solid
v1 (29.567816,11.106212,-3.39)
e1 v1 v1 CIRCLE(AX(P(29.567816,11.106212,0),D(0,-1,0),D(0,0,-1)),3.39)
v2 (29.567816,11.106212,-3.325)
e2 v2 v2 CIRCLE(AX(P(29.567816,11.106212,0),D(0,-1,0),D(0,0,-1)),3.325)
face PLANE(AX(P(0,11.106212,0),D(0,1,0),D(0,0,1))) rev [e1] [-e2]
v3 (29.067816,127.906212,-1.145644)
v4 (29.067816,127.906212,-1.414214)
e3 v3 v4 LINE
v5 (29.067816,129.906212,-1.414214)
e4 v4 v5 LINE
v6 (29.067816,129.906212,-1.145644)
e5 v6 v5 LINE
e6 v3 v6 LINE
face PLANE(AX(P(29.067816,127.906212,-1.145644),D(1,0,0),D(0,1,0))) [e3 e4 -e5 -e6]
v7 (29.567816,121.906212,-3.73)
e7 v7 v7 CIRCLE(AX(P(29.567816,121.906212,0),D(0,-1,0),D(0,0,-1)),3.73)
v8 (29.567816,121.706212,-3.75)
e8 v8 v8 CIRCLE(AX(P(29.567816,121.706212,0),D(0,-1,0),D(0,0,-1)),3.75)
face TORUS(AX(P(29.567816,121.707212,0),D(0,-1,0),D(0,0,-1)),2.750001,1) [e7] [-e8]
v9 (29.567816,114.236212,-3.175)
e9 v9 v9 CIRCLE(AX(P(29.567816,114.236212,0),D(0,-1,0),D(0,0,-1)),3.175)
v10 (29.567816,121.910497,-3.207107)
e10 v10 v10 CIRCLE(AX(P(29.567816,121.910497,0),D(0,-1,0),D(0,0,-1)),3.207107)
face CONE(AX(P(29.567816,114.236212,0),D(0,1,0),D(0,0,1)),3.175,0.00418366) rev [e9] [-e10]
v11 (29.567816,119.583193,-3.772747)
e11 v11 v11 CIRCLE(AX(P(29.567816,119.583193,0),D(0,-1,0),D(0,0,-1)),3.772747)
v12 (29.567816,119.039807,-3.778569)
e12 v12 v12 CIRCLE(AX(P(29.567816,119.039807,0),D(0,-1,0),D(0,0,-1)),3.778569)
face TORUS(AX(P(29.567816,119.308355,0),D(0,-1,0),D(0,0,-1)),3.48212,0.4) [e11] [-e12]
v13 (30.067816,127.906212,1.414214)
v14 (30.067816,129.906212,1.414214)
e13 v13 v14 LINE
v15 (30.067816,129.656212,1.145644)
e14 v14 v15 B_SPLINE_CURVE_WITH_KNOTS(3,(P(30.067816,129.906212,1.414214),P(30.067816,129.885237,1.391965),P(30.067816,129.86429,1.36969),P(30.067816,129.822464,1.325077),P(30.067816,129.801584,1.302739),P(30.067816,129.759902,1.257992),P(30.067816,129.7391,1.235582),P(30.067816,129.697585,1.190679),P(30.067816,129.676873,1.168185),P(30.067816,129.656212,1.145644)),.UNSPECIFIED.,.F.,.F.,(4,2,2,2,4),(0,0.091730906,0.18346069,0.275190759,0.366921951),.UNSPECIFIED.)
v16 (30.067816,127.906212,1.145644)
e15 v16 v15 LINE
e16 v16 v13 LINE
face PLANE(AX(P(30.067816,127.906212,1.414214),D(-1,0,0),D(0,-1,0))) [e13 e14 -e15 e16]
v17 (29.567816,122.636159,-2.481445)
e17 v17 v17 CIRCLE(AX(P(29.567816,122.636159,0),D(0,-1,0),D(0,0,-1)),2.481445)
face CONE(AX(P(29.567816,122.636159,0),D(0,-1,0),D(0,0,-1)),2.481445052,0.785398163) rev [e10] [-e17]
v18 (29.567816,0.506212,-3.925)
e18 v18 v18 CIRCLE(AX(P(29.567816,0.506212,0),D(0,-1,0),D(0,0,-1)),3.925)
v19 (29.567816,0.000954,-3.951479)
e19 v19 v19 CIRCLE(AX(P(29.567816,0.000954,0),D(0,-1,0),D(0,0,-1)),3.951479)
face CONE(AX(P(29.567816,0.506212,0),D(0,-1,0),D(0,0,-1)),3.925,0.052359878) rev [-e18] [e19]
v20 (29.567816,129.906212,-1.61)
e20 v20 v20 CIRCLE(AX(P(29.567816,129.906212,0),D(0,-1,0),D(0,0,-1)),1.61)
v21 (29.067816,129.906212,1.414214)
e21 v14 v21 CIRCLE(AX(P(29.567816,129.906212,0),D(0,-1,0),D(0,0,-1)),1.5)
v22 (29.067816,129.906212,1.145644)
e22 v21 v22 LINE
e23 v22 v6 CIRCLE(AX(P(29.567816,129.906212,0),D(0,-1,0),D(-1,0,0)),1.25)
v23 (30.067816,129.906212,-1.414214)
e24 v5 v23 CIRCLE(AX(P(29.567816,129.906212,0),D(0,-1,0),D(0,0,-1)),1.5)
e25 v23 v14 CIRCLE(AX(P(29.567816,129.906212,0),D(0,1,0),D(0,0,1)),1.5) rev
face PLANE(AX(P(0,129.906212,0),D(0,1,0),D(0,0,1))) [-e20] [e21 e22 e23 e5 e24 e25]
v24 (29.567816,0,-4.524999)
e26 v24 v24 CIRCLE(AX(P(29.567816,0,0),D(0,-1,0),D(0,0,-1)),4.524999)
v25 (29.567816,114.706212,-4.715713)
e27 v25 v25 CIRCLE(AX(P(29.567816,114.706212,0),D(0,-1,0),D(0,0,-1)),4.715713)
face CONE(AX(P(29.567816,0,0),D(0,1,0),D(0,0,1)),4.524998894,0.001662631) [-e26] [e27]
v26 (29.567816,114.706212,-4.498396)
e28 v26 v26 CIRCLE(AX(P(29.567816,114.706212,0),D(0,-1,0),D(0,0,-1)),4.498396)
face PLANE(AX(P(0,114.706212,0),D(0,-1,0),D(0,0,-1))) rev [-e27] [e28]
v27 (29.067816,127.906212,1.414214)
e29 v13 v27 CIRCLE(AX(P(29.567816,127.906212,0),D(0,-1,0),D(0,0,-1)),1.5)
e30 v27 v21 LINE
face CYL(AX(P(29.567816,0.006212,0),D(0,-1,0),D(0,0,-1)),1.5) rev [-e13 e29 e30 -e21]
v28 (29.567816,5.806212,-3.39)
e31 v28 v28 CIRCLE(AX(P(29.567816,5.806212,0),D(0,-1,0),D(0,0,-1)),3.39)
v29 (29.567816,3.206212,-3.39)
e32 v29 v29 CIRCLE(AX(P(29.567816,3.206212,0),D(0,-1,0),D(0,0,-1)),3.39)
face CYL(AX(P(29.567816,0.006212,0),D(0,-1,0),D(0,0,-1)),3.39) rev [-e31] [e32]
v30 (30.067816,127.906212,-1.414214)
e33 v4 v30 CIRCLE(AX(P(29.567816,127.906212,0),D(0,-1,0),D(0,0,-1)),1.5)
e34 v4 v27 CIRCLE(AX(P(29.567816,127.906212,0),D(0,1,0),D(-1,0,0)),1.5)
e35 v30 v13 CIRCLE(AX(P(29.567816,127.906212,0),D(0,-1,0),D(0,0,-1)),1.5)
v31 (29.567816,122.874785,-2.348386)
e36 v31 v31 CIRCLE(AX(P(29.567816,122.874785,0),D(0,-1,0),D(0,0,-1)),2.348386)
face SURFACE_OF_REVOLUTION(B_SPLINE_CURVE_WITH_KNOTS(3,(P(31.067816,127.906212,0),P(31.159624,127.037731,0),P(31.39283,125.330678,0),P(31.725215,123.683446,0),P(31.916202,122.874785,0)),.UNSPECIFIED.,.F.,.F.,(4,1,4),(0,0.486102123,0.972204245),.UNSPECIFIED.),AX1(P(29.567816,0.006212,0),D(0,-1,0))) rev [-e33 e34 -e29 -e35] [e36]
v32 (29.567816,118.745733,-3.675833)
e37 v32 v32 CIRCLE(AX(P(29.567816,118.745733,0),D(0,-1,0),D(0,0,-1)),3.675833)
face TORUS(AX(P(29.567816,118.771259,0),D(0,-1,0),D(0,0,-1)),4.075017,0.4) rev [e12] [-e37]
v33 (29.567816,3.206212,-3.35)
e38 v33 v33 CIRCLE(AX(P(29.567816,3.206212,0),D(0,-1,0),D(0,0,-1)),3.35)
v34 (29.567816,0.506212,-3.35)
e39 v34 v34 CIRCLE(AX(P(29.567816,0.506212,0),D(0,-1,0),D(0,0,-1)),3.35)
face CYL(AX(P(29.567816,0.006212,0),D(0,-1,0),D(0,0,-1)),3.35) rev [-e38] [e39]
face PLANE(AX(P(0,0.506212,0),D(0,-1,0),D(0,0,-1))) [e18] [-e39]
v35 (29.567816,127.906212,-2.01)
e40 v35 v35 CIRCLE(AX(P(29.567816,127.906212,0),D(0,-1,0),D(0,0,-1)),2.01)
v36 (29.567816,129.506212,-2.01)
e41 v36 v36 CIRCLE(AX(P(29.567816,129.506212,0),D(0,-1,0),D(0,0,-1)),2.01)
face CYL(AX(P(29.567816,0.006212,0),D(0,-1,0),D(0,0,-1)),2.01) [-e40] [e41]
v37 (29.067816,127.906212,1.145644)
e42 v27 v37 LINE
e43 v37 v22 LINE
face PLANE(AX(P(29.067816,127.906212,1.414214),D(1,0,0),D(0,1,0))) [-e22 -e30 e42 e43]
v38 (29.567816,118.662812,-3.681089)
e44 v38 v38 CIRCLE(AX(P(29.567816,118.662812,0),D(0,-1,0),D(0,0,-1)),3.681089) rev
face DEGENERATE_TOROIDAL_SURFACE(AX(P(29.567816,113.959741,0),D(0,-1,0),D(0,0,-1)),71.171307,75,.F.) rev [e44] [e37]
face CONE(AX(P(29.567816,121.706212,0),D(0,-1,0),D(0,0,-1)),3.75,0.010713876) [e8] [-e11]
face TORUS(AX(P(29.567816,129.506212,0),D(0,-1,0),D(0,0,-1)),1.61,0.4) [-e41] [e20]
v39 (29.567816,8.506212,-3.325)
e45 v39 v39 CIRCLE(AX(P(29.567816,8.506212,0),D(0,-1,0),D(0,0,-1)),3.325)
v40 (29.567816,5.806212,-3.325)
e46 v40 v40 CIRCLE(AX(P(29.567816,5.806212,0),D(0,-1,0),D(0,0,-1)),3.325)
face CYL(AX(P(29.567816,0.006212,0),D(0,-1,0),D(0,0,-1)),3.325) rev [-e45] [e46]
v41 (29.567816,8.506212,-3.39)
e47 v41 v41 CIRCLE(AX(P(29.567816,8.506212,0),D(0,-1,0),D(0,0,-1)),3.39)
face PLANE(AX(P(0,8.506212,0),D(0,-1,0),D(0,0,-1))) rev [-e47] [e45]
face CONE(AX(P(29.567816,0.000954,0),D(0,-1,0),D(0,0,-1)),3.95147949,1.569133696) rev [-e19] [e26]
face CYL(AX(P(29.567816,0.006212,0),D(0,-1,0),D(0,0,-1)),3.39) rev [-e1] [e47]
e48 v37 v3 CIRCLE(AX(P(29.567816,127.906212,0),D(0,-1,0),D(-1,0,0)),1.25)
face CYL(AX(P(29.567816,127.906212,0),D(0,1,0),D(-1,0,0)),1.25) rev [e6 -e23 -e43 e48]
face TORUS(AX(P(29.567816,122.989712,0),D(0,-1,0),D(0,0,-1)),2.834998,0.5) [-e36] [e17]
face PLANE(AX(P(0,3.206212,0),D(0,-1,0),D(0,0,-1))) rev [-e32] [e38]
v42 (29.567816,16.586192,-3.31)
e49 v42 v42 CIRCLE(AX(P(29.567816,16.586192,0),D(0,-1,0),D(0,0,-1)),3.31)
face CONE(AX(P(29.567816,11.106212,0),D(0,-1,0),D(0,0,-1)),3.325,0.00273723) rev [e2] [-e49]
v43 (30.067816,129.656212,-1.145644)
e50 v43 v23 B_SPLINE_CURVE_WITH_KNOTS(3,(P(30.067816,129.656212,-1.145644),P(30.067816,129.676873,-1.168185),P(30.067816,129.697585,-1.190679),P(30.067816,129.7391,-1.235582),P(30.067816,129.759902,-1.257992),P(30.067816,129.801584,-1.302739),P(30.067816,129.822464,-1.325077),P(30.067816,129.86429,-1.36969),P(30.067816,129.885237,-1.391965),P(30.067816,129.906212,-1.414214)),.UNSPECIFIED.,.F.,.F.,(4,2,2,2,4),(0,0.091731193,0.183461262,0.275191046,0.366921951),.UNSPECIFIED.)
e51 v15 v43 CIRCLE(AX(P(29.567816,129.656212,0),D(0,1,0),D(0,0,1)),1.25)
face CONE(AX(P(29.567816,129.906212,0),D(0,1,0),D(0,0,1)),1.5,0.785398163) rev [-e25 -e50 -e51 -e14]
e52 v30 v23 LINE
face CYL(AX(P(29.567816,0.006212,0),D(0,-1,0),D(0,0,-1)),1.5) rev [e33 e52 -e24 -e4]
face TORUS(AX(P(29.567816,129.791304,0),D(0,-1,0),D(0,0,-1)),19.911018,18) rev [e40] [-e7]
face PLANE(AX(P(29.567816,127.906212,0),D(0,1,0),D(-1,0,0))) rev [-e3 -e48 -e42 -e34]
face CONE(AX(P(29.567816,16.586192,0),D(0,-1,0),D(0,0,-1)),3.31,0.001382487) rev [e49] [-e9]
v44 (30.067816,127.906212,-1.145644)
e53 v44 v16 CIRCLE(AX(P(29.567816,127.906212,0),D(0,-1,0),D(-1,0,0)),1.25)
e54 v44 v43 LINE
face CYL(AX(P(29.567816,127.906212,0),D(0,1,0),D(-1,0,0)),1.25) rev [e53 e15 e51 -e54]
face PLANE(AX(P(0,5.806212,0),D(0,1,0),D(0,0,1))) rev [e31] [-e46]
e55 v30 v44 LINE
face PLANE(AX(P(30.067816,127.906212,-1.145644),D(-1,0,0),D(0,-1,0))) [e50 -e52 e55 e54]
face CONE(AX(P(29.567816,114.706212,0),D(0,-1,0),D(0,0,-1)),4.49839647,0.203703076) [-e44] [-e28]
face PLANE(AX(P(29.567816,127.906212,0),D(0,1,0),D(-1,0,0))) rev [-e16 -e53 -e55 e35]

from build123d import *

# Parameters (mm, degrees)
RESSALTO_EXTRUS_O1_DEPTH = 2
CHANFRO1_SIZE            = 0.25


with BuildPart() as part:
    # Esboço1 → Revolução1 (revolve)
    with BuildSketch(Plane.XY, mode=Mode.PRIVATE) as revolu_o1_sk:
        with BuildLine():
            Line((33.39279432927903, 114.70621231461361), (34.28352921645039, 114.70621231461361))
            Line((34.28352921645039, 114.70621231461361), (34.09281492826499, -3.6722014e-10))
            Line((34.09281492826499, -3.6722014e-10), (33.519295524007006, 0.00095355169187072))
            Line((33.519295524007006, 0.00095355169187072), (33.49281603427903, 0.5062123146139103))
            Line((33.49281603427903, 0.5062123146139103), (32.917816034279014, 0.5062123146139103))
            Line((32.917816034279014, 0.5062123146139103), (32.917816034279014, 3.2062123146139183))
            Line((32.917816034279014, 3.2062123146139183), (32.95781603427903, 3.2062123146139183))
            Line((32.95781603427903, 3.2062123146139183), (32.95781603427903, 5.806212314613757))
            Line((32.95781603427903, 5.806212314613757), (32.892816034279015, 5.806212314613757))
            Line((32.892816034279015, 5.806212314613757), (32.892816034279015, 8.506212314613904))
            Line((32.892816034279015, 8.506212314613904), (32.95781603427903, 8.506212314613904))
            Line((32.95781603427903, 8.506212314613904), (32.95781603427903, 11.106212314613757))
            Line((32.95781603427903, 11.106212314613757), (32.892816034279015, 11.106212314613757))
            Line((32.892816034279015, 11.106212314613757), (32.87781603427903, 16.586191785378222))
            Line((32.87781603427903, 16.586191785378222), (32.74281603427903, 114.23621231461357))
            Line((32.74281603427903, 114.23621231461357), (32.77492281544711, 121.91049693796948))
            Line((32.77492281544711, 121.91049693796948), (32.04926108640308, 122.63615866701352))
            ThreePointArc((32.04926108640308, 122.63615866701352), (31.96611615034678, 122.74620729070998), (31.91620182580704, 122.8747854388341))
            add(Edge.make_bspline(
                [(31.067816034260566, 127.90621231498098), (31.159624414103526, 127.03773067057772), (31.39283042587089, 125.33067788015003), (31.72521494180118, 123.68344608647978), (31.91620182580704, 122.8747854388341)],
                knots=[0, 0, 0, 0, 0.48610212271979525, 0.9722042454395905, 0.9722042454395905, 0.9722042454395905, 0.9722042454395905], degree=3))
            Line((31.067816034260566, 127.90621231498098), (31.067816034260566, 129.90621231461355))
            Line((31.067816034260566, 129.90621231461355), (31.177816034260562, 129.90621231461355))
            ThreePointArc((31.177816034260562, 129.90621231461355), (31.46065874673519, 129.78905502708818), (31.577816034260575, 129.50621231461355))
            Line((31.577816034260575, 129.50621231461355), (31.57781603426038, 127.90621231461355))
            ThreePointArc((31.57781603426038, 127.90621231461355), (32.17576220545956, 124.831090217024), (33.29781603426055, 121.90621231461357))
            ThreePointArc((33.29781603426055, 121.90621231461357), (33.31285372452066, 121.80671608363961), (33.31781603426054, 121.70621231461362))
            Line((33.31781603426054, 121.70621231461362), (33.34056266581645, 119.58319336939802))
            ThreePointArc((33.34056266581645, 119.58319336939802), (33.449912976284445, 119.31264051713721), (33.346384664533296, 119.03980682249646))
            ThreePointArc((33.346384664533296, 119.03980682249646), (33.26521415470539, 118.90318171386872), (33.24364865177146, 118.74573330626647))
            ThreePointArc((33.24364865177146, 118.74573330626647), (33.34544118041874, 116.72697780561127), (33.39279432927903, 114.70621231461361))
        make_face()
    revolve(revolu_o1_sk.sketch.rotate(Axis((29.567816034278994, 0.00621231461375715, 0), (0, 1, 0)), 90), axis=Axis((29.567816034278994, 0.00621231461375715, 0), (0, 1, 0)))

    # Esboço3 → Ressalto-extrusão1 (add)
    with BuildSketch(Plane(origin=(9.45e-15, 129.90621231461353, 0), x_dir=(1, -7e-17, 0), z_dir=(7e-17, 1, 0))):
        with BuildLine():
            Line((30.06781603427898, -1.4142135623730947), (30.06781603427898, -1.145643923738959))
            ThreePointArc((30.06781603427898, -1.145643923738959), (30.81781603427898, 6e-17), (30.06781603427898, 1.1456439237389604))
            Line((30.06781603427898, 1.1456439237389604), (30.06781603427898, 1.4142135623730951))
            ThreePointArc((30.06781603427898, 1.4142135623730951), (31.06781603427898, 1.2e-16), (30.06781603427898, -1.4142135623730947))
        make_face()
        with BuildLine():
            Line((29.06781603427898, -1.4142135623730947), (29.06781603427898, -1.145643923738959))
            ThreePointArc((29.06781603427898, -1.145643923738959), (28.31781603427898, -6e-17), (29.06781603427898, 1.1456439237389595))
            Line((29.06781603427898, 1.1456439237389595), (29.06781603427898, 1.4142135623730951))
            ThreePointArc((29.06781603427898, 1.4142135623730951), (28.06781603427898, -3e-17), (29.06781603427898, -1.4142135623730947))
        make_face()
    extrude(amount=-RESSALTO_EXTRUS_O1_DEPTH)

    # Chanfro1
    chanfro1_edges = [part.edges().sort_by_distance(p)[0] for p in [
        (30.81781603427899, 129.90621231461353, -5.6e-16),
    ]]
    chamfer(chanfro1_edges, length=CHANFRO1_SIZE)

    # Chanfro2
    # the kernel refuses this chamfer: 4, 0.779067052 mm, written as the material it adds along each edge
    with BuildSketch(Plane(origin=(29.567816034278994, 114.70621231461361, 0), x_dir=(0, 0, -1), z_dir=(1, 0, 0))) as chanfro2_piece_1:
        with BuildLine():
            Line((3.6487212038849575, 4.113291920261645), (4.530764025903008, -0.15669186754266207))
            Line((4.530764025903008, -0.15669186754266207), (4.530764025903008, -0.23669186754266036))
            ThreePointArc((4.530764025903008, -0.23669186754266036), (4.177871160451517, -0.0799999999999983), (3.824978295000026, -0.0799999999999983))
            Line((3.824978295000026, -0.0799999999999983), (3.7449822575423277, -0.00079623555973285))
            ThreePointArc((3.7449822575423277, -0.00079623555973285), (3.6962925947967897, 2.055128282395245), (3.5688786485986324, 4.1082753113123545))
            Line((3.5688786485986324, 4.1082753113123545), (3.6487212038849575, 4.113291920261645))
        make_face()
    revolve(axis=Axis((29.567816034278994, 114.70621231461361, 0), (0, 1, 0)))


solid = part.part
